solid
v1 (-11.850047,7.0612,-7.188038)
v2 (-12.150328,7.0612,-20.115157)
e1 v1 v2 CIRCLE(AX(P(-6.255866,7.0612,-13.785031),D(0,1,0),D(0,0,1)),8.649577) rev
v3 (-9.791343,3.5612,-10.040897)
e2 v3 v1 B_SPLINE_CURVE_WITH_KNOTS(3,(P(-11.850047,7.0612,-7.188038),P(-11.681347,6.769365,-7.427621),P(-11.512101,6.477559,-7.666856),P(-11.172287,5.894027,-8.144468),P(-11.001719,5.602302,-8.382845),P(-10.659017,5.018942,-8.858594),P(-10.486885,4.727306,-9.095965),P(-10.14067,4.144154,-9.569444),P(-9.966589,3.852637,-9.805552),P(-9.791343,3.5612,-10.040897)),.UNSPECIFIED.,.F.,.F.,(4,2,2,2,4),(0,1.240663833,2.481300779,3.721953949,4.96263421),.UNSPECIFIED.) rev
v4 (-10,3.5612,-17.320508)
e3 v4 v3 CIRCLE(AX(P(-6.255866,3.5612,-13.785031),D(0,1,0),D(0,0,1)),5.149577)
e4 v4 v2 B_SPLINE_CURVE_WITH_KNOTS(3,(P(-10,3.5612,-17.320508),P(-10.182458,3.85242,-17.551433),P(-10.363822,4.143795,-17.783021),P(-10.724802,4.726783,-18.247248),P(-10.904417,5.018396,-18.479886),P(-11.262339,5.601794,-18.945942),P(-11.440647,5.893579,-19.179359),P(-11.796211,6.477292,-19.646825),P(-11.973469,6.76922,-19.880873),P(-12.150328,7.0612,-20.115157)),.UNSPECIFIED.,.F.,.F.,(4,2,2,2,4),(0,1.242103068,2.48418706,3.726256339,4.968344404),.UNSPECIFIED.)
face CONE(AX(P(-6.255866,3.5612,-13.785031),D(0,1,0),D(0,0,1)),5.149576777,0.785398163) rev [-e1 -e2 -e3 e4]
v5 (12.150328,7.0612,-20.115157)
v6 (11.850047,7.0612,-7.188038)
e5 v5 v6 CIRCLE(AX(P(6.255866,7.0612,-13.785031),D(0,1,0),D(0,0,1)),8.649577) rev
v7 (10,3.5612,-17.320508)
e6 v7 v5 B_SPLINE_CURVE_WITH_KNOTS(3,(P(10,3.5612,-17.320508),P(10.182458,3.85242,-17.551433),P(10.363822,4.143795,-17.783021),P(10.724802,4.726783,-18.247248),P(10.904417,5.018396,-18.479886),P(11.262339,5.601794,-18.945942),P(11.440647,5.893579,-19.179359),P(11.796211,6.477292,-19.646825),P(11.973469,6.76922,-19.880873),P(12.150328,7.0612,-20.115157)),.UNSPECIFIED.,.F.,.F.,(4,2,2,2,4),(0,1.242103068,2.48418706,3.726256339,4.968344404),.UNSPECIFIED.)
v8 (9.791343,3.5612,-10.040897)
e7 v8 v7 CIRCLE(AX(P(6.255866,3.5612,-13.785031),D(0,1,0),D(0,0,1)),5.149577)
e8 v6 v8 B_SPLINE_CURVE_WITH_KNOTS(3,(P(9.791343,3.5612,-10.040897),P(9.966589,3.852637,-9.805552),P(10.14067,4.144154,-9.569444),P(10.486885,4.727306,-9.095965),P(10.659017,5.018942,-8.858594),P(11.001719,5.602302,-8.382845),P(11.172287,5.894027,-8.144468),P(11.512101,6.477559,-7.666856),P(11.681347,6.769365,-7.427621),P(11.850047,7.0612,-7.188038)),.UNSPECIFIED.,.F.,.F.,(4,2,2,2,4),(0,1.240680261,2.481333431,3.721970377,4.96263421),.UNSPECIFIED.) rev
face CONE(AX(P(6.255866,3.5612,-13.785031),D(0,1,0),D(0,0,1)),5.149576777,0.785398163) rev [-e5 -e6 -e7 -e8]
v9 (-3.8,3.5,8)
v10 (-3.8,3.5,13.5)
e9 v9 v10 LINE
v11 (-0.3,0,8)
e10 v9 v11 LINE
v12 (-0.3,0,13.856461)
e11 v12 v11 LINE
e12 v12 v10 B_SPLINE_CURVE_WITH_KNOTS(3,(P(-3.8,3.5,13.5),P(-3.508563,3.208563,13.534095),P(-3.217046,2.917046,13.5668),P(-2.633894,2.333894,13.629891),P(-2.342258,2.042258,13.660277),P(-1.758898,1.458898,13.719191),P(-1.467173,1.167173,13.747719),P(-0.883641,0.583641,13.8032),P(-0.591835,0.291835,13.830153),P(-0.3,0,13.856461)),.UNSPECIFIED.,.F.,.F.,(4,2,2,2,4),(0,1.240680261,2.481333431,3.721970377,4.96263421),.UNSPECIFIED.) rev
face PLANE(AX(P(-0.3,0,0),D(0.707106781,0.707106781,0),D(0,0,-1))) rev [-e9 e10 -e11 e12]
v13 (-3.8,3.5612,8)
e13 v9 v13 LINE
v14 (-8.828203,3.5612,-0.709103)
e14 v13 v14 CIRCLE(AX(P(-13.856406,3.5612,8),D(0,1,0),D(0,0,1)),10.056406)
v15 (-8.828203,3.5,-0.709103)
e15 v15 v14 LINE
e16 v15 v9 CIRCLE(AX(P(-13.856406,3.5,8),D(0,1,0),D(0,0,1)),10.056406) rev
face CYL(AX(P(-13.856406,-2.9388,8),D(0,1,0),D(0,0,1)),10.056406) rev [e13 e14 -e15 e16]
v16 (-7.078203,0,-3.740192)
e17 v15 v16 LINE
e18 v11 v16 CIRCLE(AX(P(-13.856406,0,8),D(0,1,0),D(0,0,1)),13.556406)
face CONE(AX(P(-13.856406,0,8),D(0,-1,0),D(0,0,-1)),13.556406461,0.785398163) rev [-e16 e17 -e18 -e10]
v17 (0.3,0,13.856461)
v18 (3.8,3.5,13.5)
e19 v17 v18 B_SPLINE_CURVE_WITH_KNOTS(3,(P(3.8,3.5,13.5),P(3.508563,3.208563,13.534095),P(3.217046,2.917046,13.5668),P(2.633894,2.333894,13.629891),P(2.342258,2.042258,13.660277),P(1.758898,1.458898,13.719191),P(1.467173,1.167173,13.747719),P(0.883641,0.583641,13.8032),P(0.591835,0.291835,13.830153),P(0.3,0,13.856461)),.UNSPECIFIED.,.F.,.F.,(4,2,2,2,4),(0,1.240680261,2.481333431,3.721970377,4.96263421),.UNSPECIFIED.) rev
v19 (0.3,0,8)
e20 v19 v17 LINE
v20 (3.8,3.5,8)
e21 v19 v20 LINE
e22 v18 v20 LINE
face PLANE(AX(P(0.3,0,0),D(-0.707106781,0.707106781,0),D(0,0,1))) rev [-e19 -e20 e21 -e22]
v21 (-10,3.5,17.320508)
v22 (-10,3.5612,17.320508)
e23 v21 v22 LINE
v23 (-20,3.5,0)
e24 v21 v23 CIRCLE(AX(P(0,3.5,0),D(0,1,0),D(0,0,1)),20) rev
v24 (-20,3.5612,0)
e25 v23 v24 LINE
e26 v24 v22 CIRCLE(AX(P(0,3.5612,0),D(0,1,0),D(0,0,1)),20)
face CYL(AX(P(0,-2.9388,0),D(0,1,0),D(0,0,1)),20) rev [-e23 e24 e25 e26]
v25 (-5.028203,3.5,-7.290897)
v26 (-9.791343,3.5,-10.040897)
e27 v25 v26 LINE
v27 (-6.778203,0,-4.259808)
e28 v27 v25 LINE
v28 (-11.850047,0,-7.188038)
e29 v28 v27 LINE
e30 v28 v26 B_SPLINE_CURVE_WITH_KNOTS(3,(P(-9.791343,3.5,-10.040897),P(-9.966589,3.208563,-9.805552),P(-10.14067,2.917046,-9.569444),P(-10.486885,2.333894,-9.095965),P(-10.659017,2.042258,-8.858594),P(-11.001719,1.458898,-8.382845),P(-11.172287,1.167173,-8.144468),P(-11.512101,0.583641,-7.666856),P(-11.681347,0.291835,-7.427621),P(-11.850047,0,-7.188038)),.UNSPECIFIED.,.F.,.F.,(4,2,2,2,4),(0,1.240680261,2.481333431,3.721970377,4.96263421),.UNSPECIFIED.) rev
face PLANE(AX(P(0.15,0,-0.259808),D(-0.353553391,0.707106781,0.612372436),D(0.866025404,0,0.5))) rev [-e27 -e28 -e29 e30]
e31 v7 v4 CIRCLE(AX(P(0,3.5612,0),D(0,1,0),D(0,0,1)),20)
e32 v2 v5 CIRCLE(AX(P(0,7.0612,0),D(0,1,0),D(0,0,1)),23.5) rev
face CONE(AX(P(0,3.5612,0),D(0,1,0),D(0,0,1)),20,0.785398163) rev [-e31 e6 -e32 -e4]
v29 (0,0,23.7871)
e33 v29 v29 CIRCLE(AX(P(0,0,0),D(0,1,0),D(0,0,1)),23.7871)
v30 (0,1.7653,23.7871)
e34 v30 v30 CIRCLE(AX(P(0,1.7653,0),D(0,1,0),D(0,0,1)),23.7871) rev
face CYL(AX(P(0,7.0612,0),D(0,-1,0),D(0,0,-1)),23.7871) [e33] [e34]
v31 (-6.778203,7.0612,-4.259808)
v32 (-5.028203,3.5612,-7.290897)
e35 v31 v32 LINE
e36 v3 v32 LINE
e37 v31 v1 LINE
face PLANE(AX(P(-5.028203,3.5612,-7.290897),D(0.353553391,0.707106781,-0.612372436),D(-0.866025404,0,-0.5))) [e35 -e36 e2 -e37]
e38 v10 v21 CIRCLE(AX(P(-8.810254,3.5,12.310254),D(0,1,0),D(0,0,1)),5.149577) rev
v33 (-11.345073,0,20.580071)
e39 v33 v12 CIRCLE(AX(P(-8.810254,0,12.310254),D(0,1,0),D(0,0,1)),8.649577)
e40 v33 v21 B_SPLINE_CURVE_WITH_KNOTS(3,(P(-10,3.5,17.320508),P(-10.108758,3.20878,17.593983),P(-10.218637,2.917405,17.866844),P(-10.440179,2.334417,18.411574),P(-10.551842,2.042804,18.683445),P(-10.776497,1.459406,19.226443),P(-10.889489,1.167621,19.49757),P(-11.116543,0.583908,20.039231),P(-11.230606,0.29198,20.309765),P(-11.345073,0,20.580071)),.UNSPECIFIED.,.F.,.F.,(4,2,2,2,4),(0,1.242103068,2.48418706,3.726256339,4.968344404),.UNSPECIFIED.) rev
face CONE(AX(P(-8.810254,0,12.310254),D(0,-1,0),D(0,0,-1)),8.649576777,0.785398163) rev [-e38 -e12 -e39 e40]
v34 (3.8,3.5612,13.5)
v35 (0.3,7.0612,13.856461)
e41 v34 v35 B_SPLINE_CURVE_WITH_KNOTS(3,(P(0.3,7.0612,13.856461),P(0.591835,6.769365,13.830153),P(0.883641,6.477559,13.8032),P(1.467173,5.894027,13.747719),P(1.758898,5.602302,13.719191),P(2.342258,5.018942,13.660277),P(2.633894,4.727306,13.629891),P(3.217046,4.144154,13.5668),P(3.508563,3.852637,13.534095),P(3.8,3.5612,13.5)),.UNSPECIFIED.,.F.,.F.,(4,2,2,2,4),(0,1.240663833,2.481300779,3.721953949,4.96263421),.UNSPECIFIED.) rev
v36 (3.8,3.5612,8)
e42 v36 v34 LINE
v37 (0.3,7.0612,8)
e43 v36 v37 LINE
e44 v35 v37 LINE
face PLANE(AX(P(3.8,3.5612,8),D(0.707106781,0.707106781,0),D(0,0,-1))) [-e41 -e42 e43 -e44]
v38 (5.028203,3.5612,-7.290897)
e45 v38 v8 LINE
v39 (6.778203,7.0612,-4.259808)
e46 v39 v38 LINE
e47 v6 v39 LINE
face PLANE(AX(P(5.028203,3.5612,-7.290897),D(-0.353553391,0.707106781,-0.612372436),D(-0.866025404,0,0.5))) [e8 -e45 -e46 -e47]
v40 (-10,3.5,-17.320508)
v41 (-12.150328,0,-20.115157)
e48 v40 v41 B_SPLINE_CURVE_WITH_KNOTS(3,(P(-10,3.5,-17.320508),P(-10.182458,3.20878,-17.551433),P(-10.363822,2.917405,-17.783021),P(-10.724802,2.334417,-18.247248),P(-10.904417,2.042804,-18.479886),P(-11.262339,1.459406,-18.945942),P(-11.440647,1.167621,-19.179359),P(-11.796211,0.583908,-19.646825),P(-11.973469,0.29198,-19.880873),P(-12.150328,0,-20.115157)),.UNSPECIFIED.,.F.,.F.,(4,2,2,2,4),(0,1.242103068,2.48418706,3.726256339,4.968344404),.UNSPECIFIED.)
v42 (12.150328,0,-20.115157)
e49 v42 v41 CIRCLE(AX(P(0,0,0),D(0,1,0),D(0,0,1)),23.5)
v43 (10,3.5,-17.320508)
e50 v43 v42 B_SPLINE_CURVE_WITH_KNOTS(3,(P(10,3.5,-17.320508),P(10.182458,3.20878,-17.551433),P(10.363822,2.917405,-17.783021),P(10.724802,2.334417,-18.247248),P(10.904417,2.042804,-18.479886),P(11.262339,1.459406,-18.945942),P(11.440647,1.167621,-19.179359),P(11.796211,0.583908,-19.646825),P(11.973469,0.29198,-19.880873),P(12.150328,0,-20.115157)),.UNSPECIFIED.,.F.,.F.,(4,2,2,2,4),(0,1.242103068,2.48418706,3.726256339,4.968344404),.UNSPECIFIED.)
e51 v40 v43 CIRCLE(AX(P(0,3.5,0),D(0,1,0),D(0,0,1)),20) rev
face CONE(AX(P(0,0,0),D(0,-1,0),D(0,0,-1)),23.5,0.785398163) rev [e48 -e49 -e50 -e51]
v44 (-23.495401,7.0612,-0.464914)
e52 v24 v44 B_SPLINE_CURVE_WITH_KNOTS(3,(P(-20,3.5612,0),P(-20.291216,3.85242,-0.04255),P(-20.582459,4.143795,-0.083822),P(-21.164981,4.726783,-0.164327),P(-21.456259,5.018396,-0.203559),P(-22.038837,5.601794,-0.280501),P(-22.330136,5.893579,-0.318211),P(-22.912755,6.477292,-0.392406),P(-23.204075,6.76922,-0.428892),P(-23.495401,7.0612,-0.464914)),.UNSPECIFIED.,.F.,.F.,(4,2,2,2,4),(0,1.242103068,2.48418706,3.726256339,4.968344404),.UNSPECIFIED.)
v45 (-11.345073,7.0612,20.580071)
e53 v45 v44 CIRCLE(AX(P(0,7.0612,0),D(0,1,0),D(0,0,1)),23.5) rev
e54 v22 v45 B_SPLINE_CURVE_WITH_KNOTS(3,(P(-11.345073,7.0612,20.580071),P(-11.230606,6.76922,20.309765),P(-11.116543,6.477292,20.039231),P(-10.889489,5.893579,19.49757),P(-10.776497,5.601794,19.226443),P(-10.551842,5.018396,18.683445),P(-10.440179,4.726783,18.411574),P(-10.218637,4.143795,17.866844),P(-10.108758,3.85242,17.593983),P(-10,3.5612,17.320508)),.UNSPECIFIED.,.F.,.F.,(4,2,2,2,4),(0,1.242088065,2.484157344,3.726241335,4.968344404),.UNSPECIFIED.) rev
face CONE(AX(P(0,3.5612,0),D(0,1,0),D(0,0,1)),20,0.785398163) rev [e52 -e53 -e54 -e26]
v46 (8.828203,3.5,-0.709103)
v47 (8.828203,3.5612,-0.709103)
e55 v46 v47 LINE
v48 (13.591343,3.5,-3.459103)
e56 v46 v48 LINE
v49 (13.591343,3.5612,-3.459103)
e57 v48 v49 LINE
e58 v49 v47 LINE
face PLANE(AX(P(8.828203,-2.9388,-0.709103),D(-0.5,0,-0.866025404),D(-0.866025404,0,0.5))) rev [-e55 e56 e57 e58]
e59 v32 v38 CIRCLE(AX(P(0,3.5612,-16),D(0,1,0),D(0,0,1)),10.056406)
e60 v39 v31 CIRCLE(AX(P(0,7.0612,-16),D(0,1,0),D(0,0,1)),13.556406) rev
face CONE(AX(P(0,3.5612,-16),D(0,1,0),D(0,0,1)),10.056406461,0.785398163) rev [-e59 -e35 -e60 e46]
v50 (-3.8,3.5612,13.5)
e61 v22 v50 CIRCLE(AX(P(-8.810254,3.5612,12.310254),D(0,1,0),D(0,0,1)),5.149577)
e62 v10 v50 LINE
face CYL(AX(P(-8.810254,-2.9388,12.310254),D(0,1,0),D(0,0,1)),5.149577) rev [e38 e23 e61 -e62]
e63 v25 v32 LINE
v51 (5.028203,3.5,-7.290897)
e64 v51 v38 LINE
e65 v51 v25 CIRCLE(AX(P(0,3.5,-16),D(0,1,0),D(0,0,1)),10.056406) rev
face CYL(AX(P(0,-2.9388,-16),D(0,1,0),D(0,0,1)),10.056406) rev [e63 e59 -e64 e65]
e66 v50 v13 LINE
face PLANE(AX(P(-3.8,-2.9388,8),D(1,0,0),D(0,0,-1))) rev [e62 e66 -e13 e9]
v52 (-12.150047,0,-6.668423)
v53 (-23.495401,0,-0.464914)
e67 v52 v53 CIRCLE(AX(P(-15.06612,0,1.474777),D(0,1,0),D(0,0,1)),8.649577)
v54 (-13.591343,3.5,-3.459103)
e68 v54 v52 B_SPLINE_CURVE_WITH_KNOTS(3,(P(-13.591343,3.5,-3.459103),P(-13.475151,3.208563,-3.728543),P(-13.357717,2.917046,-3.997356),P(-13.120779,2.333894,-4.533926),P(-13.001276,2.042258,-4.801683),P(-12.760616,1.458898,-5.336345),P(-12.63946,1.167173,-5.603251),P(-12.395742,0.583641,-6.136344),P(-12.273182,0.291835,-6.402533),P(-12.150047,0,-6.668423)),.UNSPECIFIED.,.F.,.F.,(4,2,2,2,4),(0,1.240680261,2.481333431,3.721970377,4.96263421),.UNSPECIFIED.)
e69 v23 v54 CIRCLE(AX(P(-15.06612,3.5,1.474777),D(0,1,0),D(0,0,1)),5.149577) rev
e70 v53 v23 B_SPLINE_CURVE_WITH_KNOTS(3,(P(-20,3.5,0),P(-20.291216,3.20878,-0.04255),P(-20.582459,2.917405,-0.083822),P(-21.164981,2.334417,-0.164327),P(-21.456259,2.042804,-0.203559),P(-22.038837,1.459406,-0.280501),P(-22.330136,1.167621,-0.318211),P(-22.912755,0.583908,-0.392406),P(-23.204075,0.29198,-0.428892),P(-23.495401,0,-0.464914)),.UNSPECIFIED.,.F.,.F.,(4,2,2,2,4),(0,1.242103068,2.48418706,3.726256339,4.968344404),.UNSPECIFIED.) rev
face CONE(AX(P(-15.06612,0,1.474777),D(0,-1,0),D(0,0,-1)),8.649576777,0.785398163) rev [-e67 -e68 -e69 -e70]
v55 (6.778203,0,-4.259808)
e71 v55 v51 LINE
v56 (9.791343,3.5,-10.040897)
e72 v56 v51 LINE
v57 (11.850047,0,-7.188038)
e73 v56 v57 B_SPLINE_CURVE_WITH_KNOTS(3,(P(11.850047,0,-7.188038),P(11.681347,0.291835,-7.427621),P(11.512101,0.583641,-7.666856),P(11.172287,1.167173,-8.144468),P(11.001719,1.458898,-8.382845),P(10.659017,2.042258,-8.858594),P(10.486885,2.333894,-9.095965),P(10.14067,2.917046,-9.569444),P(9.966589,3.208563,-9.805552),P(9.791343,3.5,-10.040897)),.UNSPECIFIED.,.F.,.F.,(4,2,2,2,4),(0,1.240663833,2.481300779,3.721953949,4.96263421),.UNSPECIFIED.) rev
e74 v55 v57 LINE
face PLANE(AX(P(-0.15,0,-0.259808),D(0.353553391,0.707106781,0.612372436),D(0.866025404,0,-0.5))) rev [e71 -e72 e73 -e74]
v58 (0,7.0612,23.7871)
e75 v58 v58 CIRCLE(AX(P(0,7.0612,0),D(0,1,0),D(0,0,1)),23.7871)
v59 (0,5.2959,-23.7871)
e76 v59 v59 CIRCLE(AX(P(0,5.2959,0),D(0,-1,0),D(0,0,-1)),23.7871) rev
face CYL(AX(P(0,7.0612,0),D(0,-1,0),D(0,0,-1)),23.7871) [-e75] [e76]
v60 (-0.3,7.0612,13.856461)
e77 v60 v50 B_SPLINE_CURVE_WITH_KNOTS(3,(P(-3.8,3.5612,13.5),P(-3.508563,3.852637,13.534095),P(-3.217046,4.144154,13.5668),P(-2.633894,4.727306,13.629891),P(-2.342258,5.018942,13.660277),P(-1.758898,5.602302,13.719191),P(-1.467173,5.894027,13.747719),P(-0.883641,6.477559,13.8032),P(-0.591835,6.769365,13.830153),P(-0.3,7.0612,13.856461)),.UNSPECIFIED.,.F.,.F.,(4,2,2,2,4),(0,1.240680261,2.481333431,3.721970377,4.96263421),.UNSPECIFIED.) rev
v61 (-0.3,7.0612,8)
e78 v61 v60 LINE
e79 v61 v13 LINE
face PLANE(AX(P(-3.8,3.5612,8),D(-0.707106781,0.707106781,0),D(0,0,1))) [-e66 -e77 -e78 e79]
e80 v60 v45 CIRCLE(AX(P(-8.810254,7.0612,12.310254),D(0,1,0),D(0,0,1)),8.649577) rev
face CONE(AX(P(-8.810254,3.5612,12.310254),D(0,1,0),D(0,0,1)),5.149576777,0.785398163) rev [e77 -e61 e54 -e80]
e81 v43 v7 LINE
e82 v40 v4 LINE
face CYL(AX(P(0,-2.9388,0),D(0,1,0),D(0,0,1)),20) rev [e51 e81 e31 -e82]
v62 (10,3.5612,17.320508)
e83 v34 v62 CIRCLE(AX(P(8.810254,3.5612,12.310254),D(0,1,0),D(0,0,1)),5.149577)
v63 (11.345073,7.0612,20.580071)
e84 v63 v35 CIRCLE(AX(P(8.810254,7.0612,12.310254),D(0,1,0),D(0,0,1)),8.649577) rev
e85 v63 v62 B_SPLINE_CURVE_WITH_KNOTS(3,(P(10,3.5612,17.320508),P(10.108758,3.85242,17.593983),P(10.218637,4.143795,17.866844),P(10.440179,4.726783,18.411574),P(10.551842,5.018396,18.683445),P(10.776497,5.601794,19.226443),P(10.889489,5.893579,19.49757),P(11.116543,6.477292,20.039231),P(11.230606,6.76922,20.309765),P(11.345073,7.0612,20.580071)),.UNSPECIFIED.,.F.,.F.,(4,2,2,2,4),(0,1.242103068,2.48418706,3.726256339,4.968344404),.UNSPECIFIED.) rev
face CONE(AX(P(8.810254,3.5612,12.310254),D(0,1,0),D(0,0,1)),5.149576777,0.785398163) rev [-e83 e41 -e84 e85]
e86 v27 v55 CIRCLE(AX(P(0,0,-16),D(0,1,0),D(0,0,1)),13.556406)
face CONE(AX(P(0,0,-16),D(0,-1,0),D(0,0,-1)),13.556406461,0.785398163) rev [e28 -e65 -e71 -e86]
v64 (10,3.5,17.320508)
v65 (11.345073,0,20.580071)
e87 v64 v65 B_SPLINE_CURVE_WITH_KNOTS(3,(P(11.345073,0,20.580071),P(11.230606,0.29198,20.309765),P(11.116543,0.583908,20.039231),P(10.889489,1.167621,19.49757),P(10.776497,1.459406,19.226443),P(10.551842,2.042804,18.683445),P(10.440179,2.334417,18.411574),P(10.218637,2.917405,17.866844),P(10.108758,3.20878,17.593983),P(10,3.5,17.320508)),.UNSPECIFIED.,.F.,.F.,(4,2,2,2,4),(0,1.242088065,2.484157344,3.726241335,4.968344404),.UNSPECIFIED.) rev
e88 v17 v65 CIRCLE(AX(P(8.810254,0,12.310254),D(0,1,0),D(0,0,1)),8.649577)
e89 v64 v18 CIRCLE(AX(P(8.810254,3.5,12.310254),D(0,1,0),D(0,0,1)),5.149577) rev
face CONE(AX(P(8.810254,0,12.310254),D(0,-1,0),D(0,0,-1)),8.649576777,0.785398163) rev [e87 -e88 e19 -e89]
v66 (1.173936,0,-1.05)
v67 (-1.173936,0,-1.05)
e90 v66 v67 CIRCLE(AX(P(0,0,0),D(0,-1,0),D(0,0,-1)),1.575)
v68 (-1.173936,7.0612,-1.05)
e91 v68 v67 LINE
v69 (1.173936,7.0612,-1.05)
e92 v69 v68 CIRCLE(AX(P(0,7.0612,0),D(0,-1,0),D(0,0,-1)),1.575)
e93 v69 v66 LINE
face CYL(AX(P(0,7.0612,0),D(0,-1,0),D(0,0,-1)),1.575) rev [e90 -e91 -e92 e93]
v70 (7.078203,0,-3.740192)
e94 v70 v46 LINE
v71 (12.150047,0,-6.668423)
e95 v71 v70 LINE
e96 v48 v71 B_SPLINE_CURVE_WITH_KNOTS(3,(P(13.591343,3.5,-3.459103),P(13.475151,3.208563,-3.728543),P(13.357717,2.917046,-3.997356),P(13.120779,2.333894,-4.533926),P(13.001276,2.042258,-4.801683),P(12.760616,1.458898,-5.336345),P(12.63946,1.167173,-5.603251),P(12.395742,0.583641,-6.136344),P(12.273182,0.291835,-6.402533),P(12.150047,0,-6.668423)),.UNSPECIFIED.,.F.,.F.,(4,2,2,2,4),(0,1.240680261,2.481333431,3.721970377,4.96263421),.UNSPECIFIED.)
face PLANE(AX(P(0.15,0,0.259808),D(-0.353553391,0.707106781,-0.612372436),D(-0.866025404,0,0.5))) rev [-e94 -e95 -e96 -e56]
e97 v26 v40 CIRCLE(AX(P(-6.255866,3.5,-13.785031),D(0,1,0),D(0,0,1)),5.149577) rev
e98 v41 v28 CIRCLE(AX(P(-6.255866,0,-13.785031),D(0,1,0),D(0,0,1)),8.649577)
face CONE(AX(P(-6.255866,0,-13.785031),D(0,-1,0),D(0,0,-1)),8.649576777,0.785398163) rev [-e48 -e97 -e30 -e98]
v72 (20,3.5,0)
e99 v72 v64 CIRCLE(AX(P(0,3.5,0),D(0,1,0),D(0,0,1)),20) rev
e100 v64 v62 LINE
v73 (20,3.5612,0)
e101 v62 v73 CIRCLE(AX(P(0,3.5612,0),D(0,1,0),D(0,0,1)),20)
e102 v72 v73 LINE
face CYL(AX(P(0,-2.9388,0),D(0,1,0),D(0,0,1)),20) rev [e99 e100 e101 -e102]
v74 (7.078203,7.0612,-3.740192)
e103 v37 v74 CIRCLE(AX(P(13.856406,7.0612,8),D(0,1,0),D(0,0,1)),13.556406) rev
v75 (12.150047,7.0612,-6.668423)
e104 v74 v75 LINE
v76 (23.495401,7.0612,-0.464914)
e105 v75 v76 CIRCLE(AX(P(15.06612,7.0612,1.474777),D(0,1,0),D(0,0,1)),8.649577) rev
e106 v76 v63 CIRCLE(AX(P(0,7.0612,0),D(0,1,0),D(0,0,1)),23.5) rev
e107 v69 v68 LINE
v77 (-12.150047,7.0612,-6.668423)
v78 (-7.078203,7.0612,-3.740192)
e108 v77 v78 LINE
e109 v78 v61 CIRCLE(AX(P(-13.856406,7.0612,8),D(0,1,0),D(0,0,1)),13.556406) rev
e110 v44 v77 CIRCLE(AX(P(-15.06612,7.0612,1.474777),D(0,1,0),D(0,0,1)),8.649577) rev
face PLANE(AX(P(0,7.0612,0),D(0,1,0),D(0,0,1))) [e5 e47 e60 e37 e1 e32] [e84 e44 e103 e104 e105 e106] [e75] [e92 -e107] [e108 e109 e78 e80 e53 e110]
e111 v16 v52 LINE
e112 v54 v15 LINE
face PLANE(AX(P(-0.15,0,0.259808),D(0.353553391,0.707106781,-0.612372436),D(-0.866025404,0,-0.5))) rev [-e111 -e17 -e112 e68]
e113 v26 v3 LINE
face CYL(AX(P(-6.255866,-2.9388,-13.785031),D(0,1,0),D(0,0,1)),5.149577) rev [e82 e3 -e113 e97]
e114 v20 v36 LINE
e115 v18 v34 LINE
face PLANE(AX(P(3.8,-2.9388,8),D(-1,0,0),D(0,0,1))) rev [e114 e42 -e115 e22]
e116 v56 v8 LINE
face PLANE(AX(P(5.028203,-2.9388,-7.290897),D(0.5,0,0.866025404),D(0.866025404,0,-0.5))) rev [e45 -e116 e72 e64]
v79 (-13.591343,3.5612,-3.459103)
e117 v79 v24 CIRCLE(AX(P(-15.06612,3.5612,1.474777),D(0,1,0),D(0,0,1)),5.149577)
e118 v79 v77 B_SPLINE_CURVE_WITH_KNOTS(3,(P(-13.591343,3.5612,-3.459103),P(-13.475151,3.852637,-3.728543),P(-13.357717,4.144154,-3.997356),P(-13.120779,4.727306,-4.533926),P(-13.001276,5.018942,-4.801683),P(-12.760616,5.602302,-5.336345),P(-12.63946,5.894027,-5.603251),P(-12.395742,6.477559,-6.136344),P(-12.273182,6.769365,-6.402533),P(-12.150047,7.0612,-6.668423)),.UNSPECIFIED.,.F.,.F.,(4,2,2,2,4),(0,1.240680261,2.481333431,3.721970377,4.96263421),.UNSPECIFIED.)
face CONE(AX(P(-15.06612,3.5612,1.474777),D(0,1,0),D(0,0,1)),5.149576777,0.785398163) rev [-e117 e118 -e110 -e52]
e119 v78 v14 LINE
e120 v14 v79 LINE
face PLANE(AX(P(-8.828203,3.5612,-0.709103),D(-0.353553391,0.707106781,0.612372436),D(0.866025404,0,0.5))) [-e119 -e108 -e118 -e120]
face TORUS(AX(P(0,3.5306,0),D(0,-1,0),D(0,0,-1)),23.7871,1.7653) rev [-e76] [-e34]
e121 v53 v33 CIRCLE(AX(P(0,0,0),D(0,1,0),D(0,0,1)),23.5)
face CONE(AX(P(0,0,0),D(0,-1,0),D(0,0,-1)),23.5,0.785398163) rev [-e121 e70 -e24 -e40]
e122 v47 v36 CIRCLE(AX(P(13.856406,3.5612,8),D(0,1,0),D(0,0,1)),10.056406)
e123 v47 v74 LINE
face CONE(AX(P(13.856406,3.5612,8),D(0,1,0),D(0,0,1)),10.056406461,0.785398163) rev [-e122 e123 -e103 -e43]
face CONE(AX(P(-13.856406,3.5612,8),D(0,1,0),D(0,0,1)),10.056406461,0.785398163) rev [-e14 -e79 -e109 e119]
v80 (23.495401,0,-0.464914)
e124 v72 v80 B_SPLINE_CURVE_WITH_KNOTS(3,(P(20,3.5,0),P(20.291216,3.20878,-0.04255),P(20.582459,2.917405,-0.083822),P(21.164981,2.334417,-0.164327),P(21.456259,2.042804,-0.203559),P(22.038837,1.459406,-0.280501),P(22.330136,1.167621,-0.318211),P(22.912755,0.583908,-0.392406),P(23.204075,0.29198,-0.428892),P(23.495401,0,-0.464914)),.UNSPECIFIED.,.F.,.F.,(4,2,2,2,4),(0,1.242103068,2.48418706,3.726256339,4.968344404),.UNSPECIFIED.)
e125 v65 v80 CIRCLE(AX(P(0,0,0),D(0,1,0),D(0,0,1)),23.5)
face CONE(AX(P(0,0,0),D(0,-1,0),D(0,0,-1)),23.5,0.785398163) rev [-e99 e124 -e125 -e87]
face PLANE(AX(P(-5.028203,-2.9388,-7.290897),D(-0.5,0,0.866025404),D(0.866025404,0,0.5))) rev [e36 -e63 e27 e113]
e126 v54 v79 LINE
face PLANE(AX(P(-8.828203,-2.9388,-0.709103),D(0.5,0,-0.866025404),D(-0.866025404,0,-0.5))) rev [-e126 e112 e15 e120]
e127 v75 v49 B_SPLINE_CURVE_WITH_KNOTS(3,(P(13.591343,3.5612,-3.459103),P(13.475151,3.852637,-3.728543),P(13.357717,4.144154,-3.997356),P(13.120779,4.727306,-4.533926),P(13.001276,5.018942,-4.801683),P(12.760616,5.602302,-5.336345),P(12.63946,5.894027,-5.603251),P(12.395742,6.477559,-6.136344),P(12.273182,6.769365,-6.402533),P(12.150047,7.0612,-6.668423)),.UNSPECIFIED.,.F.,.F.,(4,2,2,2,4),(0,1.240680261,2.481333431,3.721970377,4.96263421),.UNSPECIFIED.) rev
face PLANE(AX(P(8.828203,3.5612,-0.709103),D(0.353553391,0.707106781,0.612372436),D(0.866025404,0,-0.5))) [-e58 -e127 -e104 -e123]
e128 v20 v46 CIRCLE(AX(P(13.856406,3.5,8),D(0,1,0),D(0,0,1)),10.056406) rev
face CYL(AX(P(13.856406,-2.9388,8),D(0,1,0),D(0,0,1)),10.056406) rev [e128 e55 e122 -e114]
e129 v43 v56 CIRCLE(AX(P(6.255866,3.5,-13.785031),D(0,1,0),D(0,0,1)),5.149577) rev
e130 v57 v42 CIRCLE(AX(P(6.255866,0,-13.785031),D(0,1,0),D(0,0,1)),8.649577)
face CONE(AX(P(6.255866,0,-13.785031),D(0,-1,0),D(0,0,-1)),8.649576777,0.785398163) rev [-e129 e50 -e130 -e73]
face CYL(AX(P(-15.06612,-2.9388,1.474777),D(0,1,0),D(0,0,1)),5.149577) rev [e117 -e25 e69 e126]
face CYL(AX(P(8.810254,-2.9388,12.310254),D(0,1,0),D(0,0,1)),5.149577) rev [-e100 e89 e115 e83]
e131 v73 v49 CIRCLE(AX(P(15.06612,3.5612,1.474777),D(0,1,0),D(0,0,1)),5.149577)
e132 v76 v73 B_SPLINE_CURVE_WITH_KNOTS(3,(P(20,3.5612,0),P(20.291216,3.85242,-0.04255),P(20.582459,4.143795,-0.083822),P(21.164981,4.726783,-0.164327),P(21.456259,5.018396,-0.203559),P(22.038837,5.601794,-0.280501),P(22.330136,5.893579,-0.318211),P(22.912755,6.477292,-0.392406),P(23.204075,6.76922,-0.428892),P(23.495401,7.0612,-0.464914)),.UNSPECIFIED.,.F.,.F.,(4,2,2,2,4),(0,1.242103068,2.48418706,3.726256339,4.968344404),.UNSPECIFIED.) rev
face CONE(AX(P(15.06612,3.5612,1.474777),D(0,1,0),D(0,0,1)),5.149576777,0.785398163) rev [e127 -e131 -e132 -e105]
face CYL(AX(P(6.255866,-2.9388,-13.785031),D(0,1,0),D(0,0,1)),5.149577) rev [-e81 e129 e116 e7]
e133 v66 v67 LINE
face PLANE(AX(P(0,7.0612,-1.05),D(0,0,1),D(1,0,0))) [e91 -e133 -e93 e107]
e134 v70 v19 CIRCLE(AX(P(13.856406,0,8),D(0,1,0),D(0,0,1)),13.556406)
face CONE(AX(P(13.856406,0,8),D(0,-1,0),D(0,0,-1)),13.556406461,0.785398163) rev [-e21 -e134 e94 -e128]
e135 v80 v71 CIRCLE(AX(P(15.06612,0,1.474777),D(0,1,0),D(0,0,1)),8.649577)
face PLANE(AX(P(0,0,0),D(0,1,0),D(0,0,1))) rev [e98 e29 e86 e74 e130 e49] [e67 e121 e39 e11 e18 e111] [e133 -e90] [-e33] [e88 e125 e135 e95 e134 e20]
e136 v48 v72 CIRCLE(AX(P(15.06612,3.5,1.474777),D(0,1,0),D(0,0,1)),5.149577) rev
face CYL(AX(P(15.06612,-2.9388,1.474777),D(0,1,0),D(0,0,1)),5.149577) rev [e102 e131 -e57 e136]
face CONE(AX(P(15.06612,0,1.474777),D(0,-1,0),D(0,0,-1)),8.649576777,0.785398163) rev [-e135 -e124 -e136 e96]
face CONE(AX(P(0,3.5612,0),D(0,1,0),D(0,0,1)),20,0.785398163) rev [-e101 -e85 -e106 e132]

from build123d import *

# Parameters (mm, degrees)
SKETCH1_R           = 23.7871
BOSS_EXTRUDE1_DEPTH = 7.0612
SKETCH3_R           = 1.7653
SKETCH5_R           = 1.575
CUT_EXTRUDE1_DEPTH  = 7.0612
BOSS_EXTRUDE3_DEPTH = 7.0612
CUT_EXTRUDE2_DEPTH  = 10
CHAMFER1_SIZE       = 3.5
CHAMFER2_SIZE       = 3.5
CHAMFER3_SIZE       = 3.5
CHAMFER4_SIZE       = 3.5
CHAMFER5_SIZE       = 3.5
CHAMFER6_SIZE       = 3.5


with BuildPart() as part:
    # Sketch1 → Boss-Extrude1 (new body)
    with BuildSketch(Plane(origin=(0, 0, 0), x_dir=(1, 0, 0), z_dir=(0, 1, 0))):
        with Locations(Location((0, 0, 0), (0, 0, 270))):
            Circle(SKETCH1_R)
    extrude(amount=BOSS_EXTRUDE1_DEPTH)

    # Sketch3 → Cut-Revolve1 (revolve, cut)
    with BuildSketch(Plane(origin=(0, 0, 0), x_dir=(0, 0, -1), z_dir=(1, 0, 0))):
        with Locations((23.7871, 3.5306)):
            Circle(SKETCH3_R)
    revolve(axis=Axis((0, 3.5306, 0), (0, 1, 0)), mode=Mode.SUBTRACT)

    # Sketch5 → Cut-Extrude1 (cut)
    with BuildSketch(Plane.XZ):
        with Locations(Location((0, 0, 0), (0, 0, 270))):
            Circle(SKETCH5_R)
    extrude(amount=-CUT_EXTRUDE1_DEPTH, mode=Mode.SUBTRACT)

    # Sketch8 → Boss-Extrude3 (add)
    with BuildSketch(Plane.XZ):
        with BuildLine():
            ThreePointArc((-1.173935688, -1.05), (0, -1.575), (1.173935688, -1.05))
            Line((1.173935688, -1.05), (-1.173935688, -1.05))
        make_face()
    extrude(amount=-BOSS_EXTRUDE3_DEPTH)

    # Sketch18 → Cut-Extrude2 (cut)
    with BuildSketch(Plane(origin=(0, 7.0612, 0), x_dir=(1, 0, 0), z_dir=(0, 1, 0))):
        with BuildLine():
            Line((-8.82820323, 0.709103466), (-13.591342951, 3.459103466))
            ThreePointArc((-13.591342951, 3.459103466), (-17.51207526, 3.056828066), (-20, 0))
            ThreePointArc((-20, 0), (-17.320508076, -10), (-10, -17.320508076))
            ThreePointArc((-10, -17.320508076), (-6.10874687, -16.694316081), (-3.8, -13.5))
            Line((-3.8, -13.5), (-3.8, -8))
            ThreePointArc((-3.8, -8), (-5.147302995, -2.97179677), (-8.82820323, 0.709103466))
        make_face()
        with BuildLine():
            Line((3.8, -8), (3.8, -13.5))
            ThreePointArc((3.8, -13.5), (6.10874687, -16.694316081), (10, -17.320508076))
            ThreePointArc((10, -17.320508076), (17.320508076, -10), (20, 0))
            ThreePointArc((20, 0), (17.51207526, 3.056828066), (13.591342951, 3.459103466))
            Line((13.591342951, 3.459103466), (8.82820323, 0.709103466))
            ThreePointArc((8.82820323, 0.709103466), (5.147302995, -2.97179677), (3.8, -8))
        make_face()
        with BuildLine():
            Line((5.02820323, 7.290896534), (9.791342951, 10.040896534))
            ThreePointArc((9.791342951, 10.040896534), (11.40332839, 13.637488015), (10, 17.320508076))
            ThreePointArc((10, 17.320508076), (0, 20), (-10, 17.320508076))
            ThreePointArc((-10, 17.320508076), (-11.40332839, 13.637488015), (-9.791342951, 10.040896534))
            Line((-9.791342951, 10.040896534), (-5.02820323, 7.290896534))
            ThreePointArc((-5.02820323, 7.290896534), (0, 5.943593539), (5.02820323, 7.290896534))
        make_face()
    extrude(amount=-CUT_EXTRUDE2_DEPTH, mode=Mode.SUBTRACT)

    # Chamfer1
    chamfer1_edges = [part.edges().sort_by_distance(p)[0] for p in [
        (-17.51207526, 7.0612, -3.056828066),
    ]]
    chamfer(chamfer1_edges, length=CHAMFER1_SIZE)
    chamfer1_2_edges = [part.edges().sort_by_distance(p)[0] for p in [
        (-6.10874687, 7.0612, 16.694316081),
    ]]
    chamfer(chamfer1_2_edges, length=CHAMFER1_SIZE)
    chamfer1_3_edges = [part.edges().sort_by_distance(p)[0] for p in [
        (-11.209773091, 7.0612, -2.084103466),
        (-3.8, 7.0612, 10.75),
        (-5.147302995, 7.0612, 2.97179677),
    ]]
    chamfer(chamfer1_3_edges, length=CHAMFER1_SIZE)
    chamfer1_4_edges = [part.edges().sort_by_distance(p)[0] for p in [
        (-17.320508076, 7.0612, 10),
    ]]
    chamfer(chamfer1_4_edges, length=CHAMFER1_SIZE - 0.0001)  # a hair under: the kernel refuses the full size

    # Chamfer2
    chamfer2_edges = [part.edges().sort_by_distance(p)[0] for p in [
        (-11.40332839, 7.0612, -13.637488015),
    ]]
    chamfer(chamfer2_edges, length=CHAMFER2_SIZE)
    chamfer2_2_edges = [part.edges().sort_by_distance(p)[0] for p in [
        (11.40332839, 7.0612, -13.637488015),
    ]]
    chamfer(chamfer2_2_edges, length=CHAMFER2_SIZE)
    chamfer2_3_edges = [part.edges().sort_by_distance(p)[0] for p in [
        (7.409773091, 7.0612, -8.665896534),
        (0, 7.0612, -5.943593539),
        (-7.409773091, 7.0612, -8.665896534),
    ]]
    chamfer(chamfer2_3_edges, length=CHAMFER2_SIZE)
    chamfer2_4_edges = [part.edges().sort_by_distance(p)[0] for p in [
        (0, 7.0612, -20),
    ]]
    chamfer(chamfer2_4_edges, length=CHAMFER2_SIZE - 0.0001)  # a hair under: the kernel refuses the full size

    # Chamfer3
    chamfer3_edges = [part.edges().sort_by_distance(p)[0] for p in [
        (17.51207526, 7.0612, -3.056828066),
    ]]
    chamfer(chamfer3_edges, length=CHAMFER3_SIZE)
    chamfer3_2_edges = [part.edges().sort_by_distance(p)[0] for p in [
        (6.10874687, 7.0612, 16.694316081),
    ]]
    chamfer(chamfer3_2_edges, length=CHAMFER3_SIZE)
    chamfer3_3_edges = [part.edges().sort_by_distance(p)[0] for p in [
        (5.147302995, 7.0612, 2.97179677),
        (11.209773091, 7.0612, -2.084103466),
        (3.8, 7.0612, 10.75),
    ]]
    chamfer(chamfer3_3_edges, length=CHAMFER3_SIZE - 0.0001)  # a hair under: the kernel refuses the full size
    chamfer3_4_edges = [part.edges().sort_by_distance(p)[0] for p in [
        (17.320508076, 7.0612, 10),
    ]]
    chamfer(chamfer3_4_edges, length=CHAMFER3_SIZE - 0.0001)  # a hair under: the kernel refuses the full size

    # Chamfer4
    chamfer4_edges = [part.edges().sort_by_distance(p)[0] for p in [
        (17.51207526, 0, -3.056828066),
    ]]
    chamfer(chamfer4_edges, length=CHAMFER4_SIZE)
    chamfer4_2_edges = [part.edges().sort_by_distance(p)[0] for p in [
        (6.10874687, 0, 16.694316081),
    ]]
    chamfer(chamfer4_2_edges, length=CHAMFER4_SIZE)
    chamfer4_3_edges = [part.edges().sort_by_distance(p)[0] for p in [
        (17.320508076, 0, 10),
    ]]
    chamfer(chamfer4_3_edges, length=CHAMFER4_SIZE - 0.0001)  # a hair under: the kernel refuses the full size
    chamfer4_4_edges = [part.edges().sort_by_distance(p)[0] for p in [
        (11.209773091, 0, -2.084103466),
        (3.8, 0, 10.75),
        (5.147302995, 0, 2.97179677),
    ]]
    chamfer(chamfer4_4_edges, length=CHAMFER4_SIZE)

    # Chamfer5
    chamfer5_edges = [part.edges().sort_by_distance(p)[0] for p in [
        (-11.40332839, 0, -13.637488015),
    ]]
    chamfer(chamfer5_edges, length=CHAMFER5_SIZE)
    chamfer5_2_edges = [part.edges().sort_by_distance(p)[0] for p in [
        (11.40332839, 0, -13.637488015),
    ]]
    chamfer(chamfer5_2_edges, length=CHAMFER5_SIZE)
    chamfer5_3_edges = [part.edges().sort_by_distance(p)[0] for p in [
        (7.409773091, 0, -8.665896534),
        (0, 0, -5.943593539),
        (-7.409773091, 0, -8.665896534),
    ]]
    chamfer(chamfer5_3_edges, length=CHAMFER5_SIZE)
    chamfer5_4_edges = [part.edges().sort_by_distance(p)[0] for p in [
        (0, 0, -20),
    ]]
    chamfer(chamfer5_4_edges, length=CHAMFER5_SIZE - 0.0001)  # a hair under: the kernel refuses the full size

    # Chamfer6
    chamfer6_edges = [part.edges().sort_by_distance(p)[0] for p in [
        (-6.10874687, 0, 16.694316081),
    ]]
    chamfer(chamfer6_edges, length=CHAMFER6_SIZE)
    chamfer6_2_edges = [part.edges().sort_by_distance(p)[0] for p in [
        (-17.51207526, 0, -3.056828066),
    ]]
    chamfer(chamfer6_2_edges, length=CHAMFER6_SIZE)
    chamfer6_3_edges = [part.edges().sort_by_distance(p)[0] for p in [
        (-11.209773091, 0, -2.084103466),
        (-5.147302995, 0, 2.97179677),
        (-3.8, 0, 10.75),
    ]]
    chamfer(chamfer6_3_edges, length=CHAMFER6_SIZE)
    chamfer6_4_edges = [part.edges().sort_by_distance(p)[0] for p in [
        (-17.320508076, 0, 10),
    ]]
    chamfer(chamfer6_4_edges, length=CHAMFER6_SIZE - 0.0001)  # a hair under: the kernel refuses the full size


solid = part.part
